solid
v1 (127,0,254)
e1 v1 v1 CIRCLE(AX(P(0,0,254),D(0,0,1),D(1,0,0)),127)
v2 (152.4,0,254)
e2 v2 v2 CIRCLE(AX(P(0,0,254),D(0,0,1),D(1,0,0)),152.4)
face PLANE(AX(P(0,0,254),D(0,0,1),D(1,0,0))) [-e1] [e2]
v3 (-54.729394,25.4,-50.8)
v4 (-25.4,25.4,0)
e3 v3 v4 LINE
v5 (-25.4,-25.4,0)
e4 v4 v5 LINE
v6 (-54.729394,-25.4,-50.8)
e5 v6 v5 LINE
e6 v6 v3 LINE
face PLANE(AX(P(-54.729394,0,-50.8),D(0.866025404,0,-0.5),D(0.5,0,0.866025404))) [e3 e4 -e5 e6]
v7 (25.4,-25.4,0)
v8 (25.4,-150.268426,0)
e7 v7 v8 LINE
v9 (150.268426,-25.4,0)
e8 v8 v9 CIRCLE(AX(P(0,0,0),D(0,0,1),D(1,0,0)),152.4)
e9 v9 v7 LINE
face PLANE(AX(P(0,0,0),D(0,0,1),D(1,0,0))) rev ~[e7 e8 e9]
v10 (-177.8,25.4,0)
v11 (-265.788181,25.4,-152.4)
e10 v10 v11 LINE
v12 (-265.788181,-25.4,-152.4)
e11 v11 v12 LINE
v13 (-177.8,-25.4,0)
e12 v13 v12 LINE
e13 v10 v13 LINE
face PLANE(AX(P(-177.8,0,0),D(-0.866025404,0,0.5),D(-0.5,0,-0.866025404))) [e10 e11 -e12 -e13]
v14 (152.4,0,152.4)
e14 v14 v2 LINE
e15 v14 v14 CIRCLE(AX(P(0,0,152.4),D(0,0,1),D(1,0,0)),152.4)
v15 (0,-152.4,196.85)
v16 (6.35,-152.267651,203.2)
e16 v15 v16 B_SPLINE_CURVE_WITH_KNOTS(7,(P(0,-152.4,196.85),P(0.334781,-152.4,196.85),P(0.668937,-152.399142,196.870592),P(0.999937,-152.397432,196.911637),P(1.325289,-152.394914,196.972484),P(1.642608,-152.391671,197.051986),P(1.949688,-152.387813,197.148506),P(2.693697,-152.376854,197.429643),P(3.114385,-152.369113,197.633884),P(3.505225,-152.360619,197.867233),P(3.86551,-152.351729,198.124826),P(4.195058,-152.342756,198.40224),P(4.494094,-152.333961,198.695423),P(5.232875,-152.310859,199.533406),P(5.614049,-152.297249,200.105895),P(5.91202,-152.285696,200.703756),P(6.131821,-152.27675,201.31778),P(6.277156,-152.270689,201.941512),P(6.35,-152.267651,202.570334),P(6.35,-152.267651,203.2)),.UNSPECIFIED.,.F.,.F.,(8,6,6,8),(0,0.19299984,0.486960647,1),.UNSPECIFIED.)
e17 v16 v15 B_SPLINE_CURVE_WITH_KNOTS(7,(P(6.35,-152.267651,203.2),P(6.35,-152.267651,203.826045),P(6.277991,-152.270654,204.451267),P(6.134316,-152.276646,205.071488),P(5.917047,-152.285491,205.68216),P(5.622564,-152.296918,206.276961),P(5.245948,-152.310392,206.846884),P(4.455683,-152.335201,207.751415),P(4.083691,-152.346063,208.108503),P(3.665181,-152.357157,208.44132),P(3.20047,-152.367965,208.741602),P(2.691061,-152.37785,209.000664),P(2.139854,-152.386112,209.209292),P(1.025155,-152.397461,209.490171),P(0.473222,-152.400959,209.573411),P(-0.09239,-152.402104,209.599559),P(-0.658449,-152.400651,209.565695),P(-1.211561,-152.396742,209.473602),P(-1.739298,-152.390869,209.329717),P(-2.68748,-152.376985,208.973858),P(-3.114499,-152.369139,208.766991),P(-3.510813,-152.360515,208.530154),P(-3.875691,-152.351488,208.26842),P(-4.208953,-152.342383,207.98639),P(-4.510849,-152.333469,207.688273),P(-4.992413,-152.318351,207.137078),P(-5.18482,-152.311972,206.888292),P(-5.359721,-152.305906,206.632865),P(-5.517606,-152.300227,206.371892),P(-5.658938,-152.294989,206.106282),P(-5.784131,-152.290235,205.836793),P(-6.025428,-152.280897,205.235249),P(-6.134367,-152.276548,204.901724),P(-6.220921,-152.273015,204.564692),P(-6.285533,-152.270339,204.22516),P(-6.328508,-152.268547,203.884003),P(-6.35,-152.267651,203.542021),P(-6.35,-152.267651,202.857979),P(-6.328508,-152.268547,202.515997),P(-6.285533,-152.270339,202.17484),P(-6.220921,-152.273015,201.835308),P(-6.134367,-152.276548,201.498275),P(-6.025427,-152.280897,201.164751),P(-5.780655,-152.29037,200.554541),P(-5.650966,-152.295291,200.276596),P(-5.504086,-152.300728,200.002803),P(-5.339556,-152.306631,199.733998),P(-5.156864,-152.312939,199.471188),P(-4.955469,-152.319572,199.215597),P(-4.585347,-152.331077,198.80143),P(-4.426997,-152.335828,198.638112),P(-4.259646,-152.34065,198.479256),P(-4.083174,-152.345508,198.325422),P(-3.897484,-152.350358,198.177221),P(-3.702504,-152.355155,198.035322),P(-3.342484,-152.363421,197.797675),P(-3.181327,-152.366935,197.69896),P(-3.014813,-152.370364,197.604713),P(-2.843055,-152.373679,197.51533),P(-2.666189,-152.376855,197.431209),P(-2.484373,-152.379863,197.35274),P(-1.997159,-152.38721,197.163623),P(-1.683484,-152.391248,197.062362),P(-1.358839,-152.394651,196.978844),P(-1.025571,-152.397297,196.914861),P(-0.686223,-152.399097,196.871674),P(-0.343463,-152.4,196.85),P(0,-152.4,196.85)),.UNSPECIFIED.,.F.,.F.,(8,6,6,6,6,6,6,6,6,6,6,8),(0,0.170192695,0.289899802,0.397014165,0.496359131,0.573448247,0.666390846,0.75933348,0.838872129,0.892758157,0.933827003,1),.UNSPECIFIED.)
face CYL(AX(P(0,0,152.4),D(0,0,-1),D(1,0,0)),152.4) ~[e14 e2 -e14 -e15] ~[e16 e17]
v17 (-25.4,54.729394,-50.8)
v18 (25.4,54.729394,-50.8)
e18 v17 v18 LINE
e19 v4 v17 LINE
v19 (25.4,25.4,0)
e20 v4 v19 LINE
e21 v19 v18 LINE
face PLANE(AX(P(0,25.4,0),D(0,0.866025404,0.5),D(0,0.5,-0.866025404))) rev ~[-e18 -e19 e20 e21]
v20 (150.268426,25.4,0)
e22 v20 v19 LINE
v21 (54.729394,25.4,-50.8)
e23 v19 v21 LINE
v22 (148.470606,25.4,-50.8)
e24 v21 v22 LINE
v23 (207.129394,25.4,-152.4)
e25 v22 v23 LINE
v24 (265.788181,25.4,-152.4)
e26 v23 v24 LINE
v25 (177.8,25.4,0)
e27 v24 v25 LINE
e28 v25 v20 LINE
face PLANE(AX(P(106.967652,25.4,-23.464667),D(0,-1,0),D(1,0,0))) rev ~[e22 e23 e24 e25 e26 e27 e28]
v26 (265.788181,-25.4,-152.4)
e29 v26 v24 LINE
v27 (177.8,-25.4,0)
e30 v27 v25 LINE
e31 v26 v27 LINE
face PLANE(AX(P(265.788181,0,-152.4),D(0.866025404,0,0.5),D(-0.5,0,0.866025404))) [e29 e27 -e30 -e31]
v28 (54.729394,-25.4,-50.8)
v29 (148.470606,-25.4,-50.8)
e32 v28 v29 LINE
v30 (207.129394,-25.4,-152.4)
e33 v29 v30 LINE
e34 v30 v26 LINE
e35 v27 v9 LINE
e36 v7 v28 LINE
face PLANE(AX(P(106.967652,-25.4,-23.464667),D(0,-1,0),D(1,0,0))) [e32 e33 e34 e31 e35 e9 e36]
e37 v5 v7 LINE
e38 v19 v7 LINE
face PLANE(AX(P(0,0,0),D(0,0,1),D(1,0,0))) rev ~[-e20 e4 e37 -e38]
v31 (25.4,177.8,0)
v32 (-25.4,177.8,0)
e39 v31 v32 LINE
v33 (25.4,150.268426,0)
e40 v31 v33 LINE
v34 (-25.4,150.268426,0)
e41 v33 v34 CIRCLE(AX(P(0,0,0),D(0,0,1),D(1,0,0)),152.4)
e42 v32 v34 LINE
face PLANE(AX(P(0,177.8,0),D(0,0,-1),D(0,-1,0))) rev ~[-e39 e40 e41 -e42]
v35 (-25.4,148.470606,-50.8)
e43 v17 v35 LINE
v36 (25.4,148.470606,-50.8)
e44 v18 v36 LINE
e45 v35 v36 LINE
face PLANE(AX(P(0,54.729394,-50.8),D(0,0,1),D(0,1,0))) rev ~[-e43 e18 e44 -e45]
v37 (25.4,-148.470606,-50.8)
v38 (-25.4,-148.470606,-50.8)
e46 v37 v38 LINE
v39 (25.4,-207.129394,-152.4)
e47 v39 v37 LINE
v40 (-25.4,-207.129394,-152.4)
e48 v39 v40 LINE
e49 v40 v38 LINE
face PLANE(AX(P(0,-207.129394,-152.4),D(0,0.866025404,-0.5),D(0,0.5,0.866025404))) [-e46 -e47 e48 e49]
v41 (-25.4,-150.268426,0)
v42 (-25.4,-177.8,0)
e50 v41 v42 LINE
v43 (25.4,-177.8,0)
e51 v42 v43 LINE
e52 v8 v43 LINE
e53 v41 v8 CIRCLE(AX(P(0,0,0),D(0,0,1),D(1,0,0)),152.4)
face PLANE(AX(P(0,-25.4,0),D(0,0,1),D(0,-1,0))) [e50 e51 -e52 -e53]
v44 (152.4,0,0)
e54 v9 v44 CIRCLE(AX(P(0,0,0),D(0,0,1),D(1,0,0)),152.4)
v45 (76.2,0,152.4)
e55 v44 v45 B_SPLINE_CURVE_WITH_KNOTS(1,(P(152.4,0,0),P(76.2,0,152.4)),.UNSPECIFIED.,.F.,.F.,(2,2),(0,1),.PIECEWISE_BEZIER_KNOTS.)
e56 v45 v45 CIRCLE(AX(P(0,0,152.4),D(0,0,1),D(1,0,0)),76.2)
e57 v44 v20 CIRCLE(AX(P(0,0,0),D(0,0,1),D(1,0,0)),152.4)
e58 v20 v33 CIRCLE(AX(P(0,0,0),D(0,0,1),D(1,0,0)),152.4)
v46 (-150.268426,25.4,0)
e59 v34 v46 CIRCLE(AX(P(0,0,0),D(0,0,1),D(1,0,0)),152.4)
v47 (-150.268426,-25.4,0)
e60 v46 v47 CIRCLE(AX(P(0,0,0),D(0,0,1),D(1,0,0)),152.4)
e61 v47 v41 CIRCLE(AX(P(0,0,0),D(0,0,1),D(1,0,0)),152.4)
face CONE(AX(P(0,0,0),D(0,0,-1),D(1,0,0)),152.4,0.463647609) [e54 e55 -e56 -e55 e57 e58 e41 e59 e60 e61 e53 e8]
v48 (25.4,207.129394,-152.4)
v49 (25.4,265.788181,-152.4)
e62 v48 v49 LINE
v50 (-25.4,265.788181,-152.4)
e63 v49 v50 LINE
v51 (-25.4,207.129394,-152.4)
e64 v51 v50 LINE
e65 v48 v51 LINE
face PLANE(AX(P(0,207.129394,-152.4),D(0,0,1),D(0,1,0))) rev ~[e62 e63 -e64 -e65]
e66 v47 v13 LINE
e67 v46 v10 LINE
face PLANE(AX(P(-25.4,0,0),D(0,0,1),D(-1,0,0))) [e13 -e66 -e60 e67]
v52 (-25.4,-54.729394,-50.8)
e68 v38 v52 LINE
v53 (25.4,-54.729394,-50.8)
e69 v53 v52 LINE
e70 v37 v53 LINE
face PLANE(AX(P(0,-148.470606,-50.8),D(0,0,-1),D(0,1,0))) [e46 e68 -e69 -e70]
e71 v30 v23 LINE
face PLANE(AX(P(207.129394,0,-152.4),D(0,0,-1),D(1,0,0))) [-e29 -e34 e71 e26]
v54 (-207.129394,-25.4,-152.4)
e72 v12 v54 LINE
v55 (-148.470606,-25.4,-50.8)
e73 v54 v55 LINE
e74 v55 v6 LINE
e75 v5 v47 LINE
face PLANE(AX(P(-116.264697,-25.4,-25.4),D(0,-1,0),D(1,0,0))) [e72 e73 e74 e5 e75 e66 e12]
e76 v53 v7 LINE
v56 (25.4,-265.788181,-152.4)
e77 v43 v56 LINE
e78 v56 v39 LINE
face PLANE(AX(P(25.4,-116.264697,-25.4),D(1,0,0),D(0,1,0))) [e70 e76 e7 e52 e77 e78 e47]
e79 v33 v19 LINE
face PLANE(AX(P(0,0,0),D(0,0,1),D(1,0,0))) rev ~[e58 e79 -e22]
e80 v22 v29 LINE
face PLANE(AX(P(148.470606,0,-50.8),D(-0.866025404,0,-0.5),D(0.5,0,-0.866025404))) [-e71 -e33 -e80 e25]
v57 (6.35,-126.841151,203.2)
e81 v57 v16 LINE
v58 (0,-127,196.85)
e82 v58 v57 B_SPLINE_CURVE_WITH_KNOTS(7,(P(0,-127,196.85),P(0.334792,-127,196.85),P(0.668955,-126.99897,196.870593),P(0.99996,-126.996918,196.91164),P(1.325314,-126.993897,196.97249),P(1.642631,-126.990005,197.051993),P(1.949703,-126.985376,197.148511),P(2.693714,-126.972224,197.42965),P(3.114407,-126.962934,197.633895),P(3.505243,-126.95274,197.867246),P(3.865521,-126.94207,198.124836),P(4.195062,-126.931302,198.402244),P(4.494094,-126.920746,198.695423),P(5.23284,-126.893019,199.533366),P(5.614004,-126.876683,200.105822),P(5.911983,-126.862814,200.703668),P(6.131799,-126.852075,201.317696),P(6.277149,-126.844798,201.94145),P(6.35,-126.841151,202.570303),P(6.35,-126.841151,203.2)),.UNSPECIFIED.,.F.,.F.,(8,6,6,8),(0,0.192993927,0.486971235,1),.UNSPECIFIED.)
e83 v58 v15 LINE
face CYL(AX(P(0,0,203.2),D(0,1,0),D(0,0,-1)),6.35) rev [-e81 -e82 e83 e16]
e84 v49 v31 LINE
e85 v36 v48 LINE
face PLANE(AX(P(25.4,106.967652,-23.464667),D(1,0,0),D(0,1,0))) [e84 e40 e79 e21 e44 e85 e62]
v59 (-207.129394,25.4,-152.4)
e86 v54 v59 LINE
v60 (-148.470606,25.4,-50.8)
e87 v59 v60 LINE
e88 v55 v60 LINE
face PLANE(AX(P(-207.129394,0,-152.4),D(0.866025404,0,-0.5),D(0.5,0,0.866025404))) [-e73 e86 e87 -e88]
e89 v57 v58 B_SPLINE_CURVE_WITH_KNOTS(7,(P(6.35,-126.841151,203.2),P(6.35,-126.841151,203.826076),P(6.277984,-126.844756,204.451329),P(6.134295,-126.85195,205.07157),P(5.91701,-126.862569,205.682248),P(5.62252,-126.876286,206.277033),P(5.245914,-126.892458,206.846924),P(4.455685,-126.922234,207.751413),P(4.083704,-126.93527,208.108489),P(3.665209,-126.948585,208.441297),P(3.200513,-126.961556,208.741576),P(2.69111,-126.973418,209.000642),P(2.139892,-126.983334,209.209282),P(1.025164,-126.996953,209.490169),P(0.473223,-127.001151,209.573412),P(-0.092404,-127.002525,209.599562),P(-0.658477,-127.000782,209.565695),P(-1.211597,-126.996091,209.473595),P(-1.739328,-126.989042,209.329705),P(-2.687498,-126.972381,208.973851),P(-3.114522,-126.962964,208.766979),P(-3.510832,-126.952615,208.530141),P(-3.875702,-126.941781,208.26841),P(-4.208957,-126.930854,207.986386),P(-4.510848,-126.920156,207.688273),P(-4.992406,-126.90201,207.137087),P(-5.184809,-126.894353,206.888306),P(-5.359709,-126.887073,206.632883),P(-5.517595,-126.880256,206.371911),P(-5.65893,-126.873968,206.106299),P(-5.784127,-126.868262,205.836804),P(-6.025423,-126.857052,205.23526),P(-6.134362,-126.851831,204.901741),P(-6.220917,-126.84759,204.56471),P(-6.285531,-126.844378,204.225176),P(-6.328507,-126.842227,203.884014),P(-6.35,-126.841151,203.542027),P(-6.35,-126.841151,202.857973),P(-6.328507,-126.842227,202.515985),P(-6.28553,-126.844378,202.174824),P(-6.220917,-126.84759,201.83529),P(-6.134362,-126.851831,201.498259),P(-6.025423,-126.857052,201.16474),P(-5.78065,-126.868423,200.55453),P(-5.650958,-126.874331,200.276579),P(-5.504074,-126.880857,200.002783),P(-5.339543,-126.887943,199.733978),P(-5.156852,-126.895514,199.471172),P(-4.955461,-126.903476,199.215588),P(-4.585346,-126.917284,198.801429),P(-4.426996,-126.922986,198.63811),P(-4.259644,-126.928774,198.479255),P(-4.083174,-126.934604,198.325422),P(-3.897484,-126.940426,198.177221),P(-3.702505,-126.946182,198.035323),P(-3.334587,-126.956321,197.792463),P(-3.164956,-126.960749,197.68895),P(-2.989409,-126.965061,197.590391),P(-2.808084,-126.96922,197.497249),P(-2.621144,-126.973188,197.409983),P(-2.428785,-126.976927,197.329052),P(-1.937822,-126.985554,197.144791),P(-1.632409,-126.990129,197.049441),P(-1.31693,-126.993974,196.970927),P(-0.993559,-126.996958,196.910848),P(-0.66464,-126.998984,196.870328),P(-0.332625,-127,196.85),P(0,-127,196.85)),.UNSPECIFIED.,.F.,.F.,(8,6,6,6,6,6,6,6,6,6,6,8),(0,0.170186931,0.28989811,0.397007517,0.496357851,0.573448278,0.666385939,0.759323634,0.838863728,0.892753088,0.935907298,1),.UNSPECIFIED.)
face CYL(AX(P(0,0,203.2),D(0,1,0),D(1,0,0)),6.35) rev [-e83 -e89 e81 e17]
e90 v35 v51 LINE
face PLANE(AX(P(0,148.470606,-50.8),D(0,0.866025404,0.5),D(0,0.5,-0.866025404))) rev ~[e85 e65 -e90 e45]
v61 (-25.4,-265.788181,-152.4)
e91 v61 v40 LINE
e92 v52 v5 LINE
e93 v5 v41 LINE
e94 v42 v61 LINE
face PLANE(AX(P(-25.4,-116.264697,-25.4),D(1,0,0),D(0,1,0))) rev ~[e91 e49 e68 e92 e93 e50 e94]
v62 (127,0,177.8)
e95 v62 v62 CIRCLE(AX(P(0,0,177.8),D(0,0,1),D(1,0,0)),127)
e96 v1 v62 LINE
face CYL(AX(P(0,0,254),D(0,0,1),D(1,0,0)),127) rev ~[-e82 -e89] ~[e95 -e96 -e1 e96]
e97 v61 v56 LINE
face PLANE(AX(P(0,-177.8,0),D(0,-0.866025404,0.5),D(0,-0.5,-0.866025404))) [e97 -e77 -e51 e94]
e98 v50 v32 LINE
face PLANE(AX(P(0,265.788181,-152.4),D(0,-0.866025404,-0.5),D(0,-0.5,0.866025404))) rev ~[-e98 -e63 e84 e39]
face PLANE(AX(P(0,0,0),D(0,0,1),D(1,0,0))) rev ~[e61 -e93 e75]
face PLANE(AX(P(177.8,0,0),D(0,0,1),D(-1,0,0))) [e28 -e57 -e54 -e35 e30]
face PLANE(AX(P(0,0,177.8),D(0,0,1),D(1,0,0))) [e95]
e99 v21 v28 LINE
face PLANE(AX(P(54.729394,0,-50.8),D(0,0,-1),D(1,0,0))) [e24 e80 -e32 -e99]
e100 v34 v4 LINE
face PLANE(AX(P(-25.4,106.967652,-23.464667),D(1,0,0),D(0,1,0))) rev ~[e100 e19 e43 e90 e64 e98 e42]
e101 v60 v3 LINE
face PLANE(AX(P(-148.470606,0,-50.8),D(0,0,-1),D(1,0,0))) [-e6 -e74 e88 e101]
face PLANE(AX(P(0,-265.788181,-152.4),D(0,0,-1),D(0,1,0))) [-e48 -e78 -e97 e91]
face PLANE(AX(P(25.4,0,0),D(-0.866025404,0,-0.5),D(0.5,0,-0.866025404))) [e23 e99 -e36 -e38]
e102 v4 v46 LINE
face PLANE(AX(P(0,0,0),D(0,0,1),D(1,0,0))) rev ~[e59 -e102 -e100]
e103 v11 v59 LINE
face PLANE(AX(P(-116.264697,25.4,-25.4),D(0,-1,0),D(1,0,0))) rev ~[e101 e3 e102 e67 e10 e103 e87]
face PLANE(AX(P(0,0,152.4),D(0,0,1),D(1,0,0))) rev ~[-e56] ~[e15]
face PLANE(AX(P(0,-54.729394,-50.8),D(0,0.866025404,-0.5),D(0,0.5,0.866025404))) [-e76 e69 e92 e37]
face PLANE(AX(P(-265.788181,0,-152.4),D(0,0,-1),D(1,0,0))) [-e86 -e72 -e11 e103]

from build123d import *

# Parameters (mm, degrees)
F2_DEPTH  = 25.4
F3_DEPTH  = 25.4
F4_R      = 152.4
F6_R      = 76.2
F8_R      = 152.4
F8_R_2    = 76.2
F9_DEPTH  = 101.6
F10_R     = 127
F11_DEPTH = 76.2
F13_DEPTH = 265.7891810245


with BuildPart() as f2:
    # F0 (on Front) → F2 (new body, symmetric)
    with BuildSketch(Plane.XZ):
        Polygon((177.8, 0), (25.4, 0), (54.7293936748, -50.8), (148.4706063252, -50.8), (177.8, -50.8), align=None)
        Polygon((207.1293936748, -50.8), (177.8, 0), (177.8, -50.8), align=None)
        Polygon((177.8, -50.8), (148.4706063252, -50.8), (177.8, -101.6), align=None)
        Polygon((207.1293936748, -50.8), (177.8, -50.8), (177.8, -101.6), (207.1293936748, -152.4), (265.7881810245, -152.4), align=None)
    extrude(amount=F2_DEPTH, both=True)



with BuildPart() as f2b:
    # F0 (on Front) → F2, piece 2 (new body, symmetric)
    with BuildSketch(Plane.XZ):
        Polygon((-54.7293936748, -50.8), (-25.4, 0), (-177.8, 0), (-207.1293936748, -50.8), (-148.4706063252, -50.8), align=None)
        Polygon((-207.1293936748, -152.4), (-148.4706063252, -50.8), (-207.1293936748, -50.8), (-265.7881810245, -152.4), align=None)
    extrude(amount=F2_DEPTH, both=True)


with BuildPart() as f2_1:
    add(f2.part)

    add(f2b.part)  # F3 merges F2b
    # F1 (on Right) → F3 (join, symmetric)
    with BuildSketch(Plane.YZ):
        Polygon((177.8, 0), (25.4, 0), (54.7293936748, -50.8), (148.4706063252, -50.8), (177.8, -50.8), align=None)
        Polygon((-54.7293936748, -50.8), (-25.4, 0), (-177.8, 0), (-207.1293936748, -50.8), (-148.4706063252, -50.8), align=None)
        Polygon((207.1293936748, -50.8), (177.8, 0), (177.8, -50.8), align=None)
        Polygon((177.8, -50.8), (148.4706063252, -50.8), (177.8, -101.6), align=None)
        Polygon((207.1293936748, -50.8), (177.8, -50.8), (177.8, -101.6), (207.1293936748, -152.4), (222.5192777686, -152.4), (265.7881810245, -152.4), align=None)
        Polygon((-207.1293936748, -152.4), (-148.4706063252, -50.8), (-207.1293936748, -50.8), (-265.7881810245, -152.4), align=None)
    extrude(amount=F3_DEPTH, both=True)

    # F4 (on Top) → F7 section 0
    with BuildSketch(Plane.XY):
        Circle(F4_R)
    # F6 (on offset) → F7 section 1
    with BuildSketch(Plane.XY.offset(152.4)):
        Circle(F6_R)
    loft()

    # F8 (on face) → F9 (join)
    with BuildSketch(Plane.XY.offset(152.4)):
        Circle(F8_R)
        Circle(F8_R_2, mode=Mode.SUBTRACT)
        Circle(F8_R_2)
    extrude(amount=F9_DEPTH)

    # F10 (on face) → F11 (cut)
    with BuildSketch(Plane.XY.offset(254)):
        Circle(F10_R)
    extrude(amount=-F11_DEPTH, mode=Mode.SUBTRACT)

    # F12 (on Front) → F13 (cut, through all)
    with BuildSketch(Plane.XZ):
        with BuildLine():
            ThreePointArc((0, 196.85), (4.4901280605, 198.7098719395), (6.35, 203.2))
            ThreePointArc((6.35, 203.2), (-4.4901280605, 207.6901280605), (0, 196.85))
        make_face()
    extrude(amount=F13_DEPTH, mode=Mode.SUBTRACT)


solid = f2_1.part
